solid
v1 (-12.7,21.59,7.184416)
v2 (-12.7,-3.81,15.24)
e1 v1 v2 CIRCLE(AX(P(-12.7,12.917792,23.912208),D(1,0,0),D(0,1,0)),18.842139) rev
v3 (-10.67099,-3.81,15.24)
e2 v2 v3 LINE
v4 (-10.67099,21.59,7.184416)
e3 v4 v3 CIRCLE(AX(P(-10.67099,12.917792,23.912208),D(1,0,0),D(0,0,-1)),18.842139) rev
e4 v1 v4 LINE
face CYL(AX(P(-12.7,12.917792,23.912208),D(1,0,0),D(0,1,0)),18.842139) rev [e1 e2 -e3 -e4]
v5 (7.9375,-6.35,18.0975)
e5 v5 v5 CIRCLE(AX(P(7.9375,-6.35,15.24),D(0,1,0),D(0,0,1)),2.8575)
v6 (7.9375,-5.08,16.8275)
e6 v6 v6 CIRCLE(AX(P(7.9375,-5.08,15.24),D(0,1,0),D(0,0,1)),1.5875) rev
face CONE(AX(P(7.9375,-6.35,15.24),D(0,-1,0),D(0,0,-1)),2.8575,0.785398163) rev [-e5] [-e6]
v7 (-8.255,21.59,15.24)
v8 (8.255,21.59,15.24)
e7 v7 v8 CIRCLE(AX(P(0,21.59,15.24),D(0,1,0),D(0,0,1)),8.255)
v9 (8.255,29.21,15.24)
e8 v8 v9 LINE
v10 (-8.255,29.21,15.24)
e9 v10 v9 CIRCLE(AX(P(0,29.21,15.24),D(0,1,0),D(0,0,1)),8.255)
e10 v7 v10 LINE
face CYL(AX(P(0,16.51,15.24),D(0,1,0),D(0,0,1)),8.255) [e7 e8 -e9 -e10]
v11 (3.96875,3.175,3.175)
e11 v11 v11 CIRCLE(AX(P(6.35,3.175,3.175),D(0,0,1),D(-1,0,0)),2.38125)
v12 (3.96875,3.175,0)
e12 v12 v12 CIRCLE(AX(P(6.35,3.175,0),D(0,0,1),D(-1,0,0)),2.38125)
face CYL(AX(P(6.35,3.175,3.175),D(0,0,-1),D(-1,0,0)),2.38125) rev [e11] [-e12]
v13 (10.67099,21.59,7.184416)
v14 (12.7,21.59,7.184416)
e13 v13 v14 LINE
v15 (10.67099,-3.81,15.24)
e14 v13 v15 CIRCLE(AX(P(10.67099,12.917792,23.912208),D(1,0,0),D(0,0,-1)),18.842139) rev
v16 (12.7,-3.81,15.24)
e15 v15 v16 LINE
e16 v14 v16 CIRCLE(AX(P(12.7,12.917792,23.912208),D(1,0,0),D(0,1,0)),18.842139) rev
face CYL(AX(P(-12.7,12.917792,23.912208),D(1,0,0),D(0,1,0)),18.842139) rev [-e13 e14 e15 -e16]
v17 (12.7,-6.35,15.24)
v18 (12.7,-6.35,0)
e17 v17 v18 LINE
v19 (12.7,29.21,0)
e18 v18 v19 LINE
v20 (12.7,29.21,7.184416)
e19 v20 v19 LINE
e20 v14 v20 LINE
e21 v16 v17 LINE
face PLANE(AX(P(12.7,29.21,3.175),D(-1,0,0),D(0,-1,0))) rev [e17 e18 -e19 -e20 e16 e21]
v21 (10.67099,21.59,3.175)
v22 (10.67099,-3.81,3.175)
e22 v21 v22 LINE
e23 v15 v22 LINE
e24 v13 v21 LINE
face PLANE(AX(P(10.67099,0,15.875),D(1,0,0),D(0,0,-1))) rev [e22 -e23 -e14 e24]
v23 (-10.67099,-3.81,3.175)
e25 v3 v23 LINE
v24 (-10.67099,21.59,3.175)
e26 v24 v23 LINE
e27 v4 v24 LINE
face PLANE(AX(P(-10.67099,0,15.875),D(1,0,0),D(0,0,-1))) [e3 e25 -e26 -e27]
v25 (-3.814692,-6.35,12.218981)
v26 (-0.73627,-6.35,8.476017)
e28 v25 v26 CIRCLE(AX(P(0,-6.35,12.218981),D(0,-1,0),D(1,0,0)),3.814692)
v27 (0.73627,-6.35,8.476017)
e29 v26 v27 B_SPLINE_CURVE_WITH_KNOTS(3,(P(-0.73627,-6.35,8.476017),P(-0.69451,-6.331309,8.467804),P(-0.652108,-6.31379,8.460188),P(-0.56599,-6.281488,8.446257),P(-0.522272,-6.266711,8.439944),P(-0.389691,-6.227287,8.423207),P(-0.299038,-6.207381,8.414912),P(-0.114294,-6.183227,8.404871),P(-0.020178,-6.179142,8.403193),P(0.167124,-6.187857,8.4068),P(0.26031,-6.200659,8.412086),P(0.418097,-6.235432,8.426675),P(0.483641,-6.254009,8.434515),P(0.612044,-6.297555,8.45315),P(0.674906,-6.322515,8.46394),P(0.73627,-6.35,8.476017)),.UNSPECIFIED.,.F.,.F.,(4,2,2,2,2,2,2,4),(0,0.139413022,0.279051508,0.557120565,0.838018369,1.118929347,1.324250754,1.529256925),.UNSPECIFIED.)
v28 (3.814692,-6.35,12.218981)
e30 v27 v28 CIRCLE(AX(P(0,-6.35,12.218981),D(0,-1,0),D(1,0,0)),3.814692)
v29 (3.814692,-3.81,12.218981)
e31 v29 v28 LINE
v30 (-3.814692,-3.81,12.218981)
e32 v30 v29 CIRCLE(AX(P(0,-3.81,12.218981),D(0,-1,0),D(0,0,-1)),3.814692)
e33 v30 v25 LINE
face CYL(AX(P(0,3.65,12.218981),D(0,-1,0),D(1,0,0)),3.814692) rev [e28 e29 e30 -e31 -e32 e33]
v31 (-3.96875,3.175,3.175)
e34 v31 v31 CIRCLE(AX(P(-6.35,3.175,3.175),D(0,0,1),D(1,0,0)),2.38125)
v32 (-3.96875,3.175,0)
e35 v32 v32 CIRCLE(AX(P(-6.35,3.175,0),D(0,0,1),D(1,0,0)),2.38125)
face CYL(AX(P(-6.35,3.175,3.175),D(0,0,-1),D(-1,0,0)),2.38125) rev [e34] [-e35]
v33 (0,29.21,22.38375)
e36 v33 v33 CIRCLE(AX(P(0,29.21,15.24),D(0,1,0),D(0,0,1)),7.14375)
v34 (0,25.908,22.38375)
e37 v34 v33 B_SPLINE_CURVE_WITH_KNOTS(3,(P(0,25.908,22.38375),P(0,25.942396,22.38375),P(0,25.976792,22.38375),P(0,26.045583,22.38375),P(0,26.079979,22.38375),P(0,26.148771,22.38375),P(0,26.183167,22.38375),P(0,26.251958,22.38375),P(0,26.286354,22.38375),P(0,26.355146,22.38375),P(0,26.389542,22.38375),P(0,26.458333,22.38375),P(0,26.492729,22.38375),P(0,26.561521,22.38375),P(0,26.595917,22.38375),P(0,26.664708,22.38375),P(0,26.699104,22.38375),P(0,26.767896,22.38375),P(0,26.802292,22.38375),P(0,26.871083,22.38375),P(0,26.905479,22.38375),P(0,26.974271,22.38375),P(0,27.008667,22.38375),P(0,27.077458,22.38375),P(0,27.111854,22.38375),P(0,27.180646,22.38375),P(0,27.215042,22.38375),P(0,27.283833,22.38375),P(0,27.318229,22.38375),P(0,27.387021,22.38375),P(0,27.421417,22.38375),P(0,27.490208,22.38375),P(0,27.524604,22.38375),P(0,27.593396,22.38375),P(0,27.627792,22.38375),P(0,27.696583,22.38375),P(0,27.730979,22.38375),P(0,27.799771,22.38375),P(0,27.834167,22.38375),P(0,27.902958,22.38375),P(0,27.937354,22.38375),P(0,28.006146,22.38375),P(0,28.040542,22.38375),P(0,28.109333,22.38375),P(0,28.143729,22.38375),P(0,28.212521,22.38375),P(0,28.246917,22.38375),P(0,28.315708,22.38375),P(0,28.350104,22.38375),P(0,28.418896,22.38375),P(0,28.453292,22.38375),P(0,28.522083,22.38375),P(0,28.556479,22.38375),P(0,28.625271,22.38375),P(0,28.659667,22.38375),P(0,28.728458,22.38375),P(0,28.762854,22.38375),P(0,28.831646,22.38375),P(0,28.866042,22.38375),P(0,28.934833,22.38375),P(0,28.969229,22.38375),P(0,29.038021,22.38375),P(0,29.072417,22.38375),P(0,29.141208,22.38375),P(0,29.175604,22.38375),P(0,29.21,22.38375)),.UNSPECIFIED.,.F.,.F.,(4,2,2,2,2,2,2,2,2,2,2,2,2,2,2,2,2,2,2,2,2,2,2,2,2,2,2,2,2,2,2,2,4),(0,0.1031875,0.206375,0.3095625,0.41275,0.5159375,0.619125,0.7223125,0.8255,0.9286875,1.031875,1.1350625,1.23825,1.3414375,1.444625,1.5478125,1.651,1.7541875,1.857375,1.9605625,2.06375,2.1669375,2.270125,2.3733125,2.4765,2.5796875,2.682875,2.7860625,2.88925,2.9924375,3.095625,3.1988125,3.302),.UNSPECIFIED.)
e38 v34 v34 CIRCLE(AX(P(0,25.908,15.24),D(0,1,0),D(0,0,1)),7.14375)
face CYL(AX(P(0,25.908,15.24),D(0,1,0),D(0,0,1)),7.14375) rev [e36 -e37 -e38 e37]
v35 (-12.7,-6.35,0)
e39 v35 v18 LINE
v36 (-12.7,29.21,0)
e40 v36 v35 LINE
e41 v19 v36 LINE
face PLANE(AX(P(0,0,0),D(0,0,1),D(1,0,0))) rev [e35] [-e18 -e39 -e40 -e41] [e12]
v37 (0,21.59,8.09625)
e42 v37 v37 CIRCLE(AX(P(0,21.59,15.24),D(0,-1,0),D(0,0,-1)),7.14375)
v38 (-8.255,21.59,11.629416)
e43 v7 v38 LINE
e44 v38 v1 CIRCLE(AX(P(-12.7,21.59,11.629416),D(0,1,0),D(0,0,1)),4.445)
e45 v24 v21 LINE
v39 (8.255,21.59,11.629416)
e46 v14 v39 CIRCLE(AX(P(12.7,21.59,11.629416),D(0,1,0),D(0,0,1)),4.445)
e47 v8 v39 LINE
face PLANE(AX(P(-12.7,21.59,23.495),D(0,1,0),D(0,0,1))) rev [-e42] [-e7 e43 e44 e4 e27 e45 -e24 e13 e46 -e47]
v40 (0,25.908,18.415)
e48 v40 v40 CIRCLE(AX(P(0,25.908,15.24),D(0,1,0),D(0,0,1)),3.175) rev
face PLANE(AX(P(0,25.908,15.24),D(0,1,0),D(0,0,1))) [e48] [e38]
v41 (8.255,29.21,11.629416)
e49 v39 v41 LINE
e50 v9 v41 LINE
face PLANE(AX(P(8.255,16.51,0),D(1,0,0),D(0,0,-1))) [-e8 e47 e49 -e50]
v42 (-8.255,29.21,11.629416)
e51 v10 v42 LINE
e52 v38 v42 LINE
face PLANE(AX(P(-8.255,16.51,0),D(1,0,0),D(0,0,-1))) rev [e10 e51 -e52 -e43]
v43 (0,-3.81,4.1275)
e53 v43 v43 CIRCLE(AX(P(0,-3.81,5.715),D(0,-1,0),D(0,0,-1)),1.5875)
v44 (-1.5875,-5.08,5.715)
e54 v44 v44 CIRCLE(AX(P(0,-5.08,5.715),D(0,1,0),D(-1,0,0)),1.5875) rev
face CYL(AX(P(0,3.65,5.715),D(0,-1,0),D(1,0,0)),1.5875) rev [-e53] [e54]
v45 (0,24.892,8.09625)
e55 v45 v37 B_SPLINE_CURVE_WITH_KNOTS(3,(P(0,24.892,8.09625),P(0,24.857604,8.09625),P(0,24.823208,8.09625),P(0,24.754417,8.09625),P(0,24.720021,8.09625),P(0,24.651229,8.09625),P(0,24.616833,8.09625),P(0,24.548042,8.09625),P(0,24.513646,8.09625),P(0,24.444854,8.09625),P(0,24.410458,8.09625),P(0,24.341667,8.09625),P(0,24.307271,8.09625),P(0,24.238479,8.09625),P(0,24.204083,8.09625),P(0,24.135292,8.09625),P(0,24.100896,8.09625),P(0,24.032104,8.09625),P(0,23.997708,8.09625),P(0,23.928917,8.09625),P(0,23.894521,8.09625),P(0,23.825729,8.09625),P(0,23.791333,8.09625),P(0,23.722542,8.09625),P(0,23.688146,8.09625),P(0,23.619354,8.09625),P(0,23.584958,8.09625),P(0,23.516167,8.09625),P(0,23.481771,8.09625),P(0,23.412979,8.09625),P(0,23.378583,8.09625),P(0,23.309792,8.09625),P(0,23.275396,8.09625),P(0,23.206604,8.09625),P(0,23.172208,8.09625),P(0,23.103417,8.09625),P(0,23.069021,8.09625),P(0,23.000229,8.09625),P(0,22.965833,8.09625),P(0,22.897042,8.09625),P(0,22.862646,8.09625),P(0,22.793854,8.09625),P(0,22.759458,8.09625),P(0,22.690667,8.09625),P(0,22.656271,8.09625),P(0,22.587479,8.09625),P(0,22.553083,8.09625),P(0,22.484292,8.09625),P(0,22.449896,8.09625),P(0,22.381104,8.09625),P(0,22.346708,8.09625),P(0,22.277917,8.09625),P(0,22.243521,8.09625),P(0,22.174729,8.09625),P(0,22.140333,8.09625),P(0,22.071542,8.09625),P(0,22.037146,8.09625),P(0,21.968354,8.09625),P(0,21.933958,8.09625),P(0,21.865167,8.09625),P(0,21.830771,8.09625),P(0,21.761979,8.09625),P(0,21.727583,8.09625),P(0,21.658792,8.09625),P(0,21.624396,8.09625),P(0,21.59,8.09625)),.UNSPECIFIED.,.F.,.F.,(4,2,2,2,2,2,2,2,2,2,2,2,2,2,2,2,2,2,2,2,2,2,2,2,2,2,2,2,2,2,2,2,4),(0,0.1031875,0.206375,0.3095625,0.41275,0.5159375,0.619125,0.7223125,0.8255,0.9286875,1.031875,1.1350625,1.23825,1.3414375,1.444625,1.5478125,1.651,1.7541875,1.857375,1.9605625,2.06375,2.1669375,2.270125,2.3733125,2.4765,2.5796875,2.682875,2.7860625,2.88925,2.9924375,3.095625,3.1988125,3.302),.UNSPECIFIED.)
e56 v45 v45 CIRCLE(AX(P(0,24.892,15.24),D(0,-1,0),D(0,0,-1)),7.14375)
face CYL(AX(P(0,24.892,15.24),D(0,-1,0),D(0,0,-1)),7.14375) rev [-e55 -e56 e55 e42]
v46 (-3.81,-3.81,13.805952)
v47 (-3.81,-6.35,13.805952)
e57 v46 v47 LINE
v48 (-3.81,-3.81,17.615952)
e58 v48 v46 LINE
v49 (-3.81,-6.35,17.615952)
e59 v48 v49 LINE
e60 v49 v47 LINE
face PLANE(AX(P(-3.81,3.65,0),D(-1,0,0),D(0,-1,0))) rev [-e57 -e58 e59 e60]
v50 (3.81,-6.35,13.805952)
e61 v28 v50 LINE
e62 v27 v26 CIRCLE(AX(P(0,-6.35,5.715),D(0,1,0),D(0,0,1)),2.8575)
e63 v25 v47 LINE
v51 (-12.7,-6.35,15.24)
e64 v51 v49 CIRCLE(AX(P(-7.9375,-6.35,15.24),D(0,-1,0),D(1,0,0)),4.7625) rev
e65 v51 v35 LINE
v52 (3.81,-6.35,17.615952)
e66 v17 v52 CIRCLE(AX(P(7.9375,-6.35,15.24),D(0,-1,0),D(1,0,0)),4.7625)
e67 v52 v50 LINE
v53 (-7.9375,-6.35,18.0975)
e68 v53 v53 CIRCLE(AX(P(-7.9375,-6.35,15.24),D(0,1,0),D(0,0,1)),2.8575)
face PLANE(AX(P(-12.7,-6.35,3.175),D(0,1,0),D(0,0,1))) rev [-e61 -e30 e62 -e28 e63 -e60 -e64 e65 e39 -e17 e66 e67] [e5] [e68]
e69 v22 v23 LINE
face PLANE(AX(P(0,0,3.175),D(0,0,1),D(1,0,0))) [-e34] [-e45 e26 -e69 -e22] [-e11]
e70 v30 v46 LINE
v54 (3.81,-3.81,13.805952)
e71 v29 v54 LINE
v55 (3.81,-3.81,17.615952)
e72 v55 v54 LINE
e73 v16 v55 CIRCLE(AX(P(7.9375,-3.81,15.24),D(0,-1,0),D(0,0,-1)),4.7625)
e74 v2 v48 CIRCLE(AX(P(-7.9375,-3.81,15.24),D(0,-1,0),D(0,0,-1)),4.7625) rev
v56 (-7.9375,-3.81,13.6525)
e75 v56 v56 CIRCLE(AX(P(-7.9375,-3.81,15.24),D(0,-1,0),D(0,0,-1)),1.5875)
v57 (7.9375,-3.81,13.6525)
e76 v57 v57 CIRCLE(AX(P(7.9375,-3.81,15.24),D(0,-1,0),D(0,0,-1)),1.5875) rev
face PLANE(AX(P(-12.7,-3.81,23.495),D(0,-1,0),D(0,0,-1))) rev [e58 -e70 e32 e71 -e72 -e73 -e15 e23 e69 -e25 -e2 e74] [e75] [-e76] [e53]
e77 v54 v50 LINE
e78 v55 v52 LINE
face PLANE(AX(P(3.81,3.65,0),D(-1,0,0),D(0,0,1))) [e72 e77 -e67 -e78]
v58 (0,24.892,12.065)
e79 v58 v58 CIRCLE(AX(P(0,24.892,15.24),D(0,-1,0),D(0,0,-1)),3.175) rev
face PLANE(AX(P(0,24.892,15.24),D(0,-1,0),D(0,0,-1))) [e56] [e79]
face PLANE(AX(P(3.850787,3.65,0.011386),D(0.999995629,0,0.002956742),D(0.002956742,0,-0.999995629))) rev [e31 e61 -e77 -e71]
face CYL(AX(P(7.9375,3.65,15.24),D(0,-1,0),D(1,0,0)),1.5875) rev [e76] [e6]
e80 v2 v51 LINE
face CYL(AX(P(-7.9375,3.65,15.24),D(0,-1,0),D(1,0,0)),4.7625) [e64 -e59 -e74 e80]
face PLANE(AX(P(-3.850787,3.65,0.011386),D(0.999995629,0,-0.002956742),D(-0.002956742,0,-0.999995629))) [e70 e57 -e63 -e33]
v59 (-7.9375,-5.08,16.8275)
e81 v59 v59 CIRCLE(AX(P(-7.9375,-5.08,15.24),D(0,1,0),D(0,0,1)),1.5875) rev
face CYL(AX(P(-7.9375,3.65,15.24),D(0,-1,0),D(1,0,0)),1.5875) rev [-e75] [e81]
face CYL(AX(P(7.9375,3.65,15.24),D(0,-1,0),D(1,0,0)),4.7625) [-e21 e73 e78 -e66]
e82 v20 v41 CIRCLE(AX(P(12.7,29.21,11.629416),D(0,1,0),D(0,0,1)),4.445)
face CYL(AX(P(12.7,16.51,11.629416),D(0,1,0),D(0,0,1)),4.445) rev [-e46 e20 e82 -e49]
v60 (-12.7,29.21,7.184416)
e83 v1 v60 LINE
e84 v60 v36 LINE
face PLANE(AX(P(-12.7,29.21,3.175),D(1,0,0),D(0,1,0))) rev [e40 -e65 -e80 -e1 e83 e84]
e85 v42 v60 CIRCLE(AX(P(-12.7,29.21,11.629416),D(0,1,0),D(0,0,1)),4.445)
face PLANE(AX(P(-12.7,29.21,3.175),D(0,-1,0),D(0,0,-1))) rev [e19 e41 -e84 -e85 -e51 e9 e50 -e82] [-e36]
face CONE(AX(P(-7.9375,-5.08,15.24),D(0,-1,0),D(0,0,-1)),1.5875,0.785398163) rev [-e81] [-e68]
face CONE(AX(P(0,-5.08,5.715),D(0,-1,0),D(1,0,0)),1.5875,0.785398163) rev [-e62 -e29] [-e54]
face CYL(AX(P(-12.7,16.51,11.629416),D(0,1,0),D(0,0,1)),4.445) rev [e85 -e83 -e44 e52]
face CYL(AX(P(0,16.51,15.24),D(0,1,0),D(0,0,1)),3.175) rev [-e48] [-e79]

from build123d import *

# Parameters (mm, degrees)
SKETCH1_W           = 25.4
SKETCH1_H           = 35.56
SKETCH1_R           = 2.38125
BOSS_EXTRUDE1_DEPTH = 3.175
SKETCH7_W           = 25.4
SKETCH7_H           = 2.54
SKETCH7_H_2         = 7.62
BOSS_EXTRUDE3_DEPTH = 20.32
SKETCH11_R          = 1.5875
CUT_EXTRUDE1_DEPTH  = 10
CHAMFER2_SIZE       = 1.27
SKETCH13_R          = 3.175
CUT_EXTRUDE2_DEPTH  = 12.7
SKETCH14_R          = 7.14375
CUT_EXTRUDE3_DEPTH  = 3.302
CUT_EXTRUDE4_START  = -3.302
SKETCH15_R          = 7.14375
CUT_EXTRUDE4_DEPTH  = 3.302
CUT_EXTRUDE5_DEPTH  = 12.7
SKETCH17_W          = 2.029010409
SKETCH17_H          = 25.4
BOSS_EXTRUDE4_DEPTH = 12.7
CUT_EXTRUDE6_DEPTH  = 46.281333074


with BuildPart() as part:
    # Sketch1 → Boss-Extrude1 (new body)
    with BuildSketch(Plane.XY):
        with Locations((0, 11.43)):
            Rectangle(SKETCH1_W, SKETCH1_H)
        with Locations((-6.35, 3.175)):
            Circle(SKETCH1_R, mode=Mode.SUBTRACT)
        with Locations(Location((6.35, 3.175, 0), (0, 0, 180))):
            Circle(SKETCH1_R, mode=Mode.SUBTRACT)
    extrude(amount=BOSS_EXTRUDE1_DEPTH)

    # Sketch7 → Boss-Extrude3 (add)
    with BuildSketch(Plane.XY.offset(3.175)):
        with Locations((0, -5.08)):
            Rectangle(SKETCH7_W, SKETCH7_H)
        with Locations((0, 25.4)):
            Rectangle(SKETCH7_W, SKETCH7_H_2)
    extrude(amount=BOSS_EXTRUDE3_DEPTH)

    # Sketch11 → Cut-Extrude1 (cut)
    with BuildSketch(Plane.XZ.offset(6.35)):
        with Locations((-7.9375, 15.24)):
            Circle(SKETCH11_R)
        with Locations((7.9375, 15.24)):
            Circle(SKETCH11_R)
        with Locations((0, 5.715)):
            Circle(SKETCH11_R)
        with BuildLine():
            Line((-3.814625586, 12.241539102), (-3.814692285, 12.218981082))
            ThreePointArc((-3.814692285, 12.218981082), (0, 8.404288797), (3.814692285, 12.218981082))
            Line((3.814692285, 12.218981082), (3.814625586, 12.241539102))
            Line((3.814625586, 12.241539102), (3.81, 13.805952441))
            Line((3.81, 13.805952441), (3.81, 17.615952441))
            ThreePointArc((3.81, 17.615952441), (9.167172212, 19.841012117), (12.7, 15.24))
            Line((12.7, 15.24), (12.7, 23.495))
            Line((12.7, 23.495), (-12.7, 23.495))
            Line((-12.7, 23.495), (-12.7, 15.24))
            ThreePointArc((-12.7, 15.24), (-9.167172212, 19.841012117), (-3.81, 17.615952441))
            Line((-3.81, 17.615952441), (-3.81, 13.805952441))
            Line((-3.81, 13.805952441), (-3.814625586, 12.241539102))
        make_face()
    extrude(amount=-CUT_EXTRUDE1_DEPTH, mode=Mode.SUBTRACT)

    # Chamfer2
    # the kernel refuses this chamfer: 1.27 mm, written as the material it takes off along each edge
    with BuildSketch(Plane(origin=(-7.9375, -6.35, 15.24), x_dir=(1, 0, 0), z_dir=(0, 0, -1))) as chamfer2_piece_1:
        Polygon((1.5875 + CHAMFER2_SIZE, 0), (1.5875, -CHAMFER2_SIZE), (1.5875, 0), align=None)
    revolve(axis=Axis((-7.9375, -6.35, 15.24), (0, -1, 0)), mode=Mode.SUBTRACT)
    with BuildSketch(Plane(origin=(7.9375, -6.35, 15.24), x_dir=(1, 0, 0), z_dir=(0, 0, -1))) as chamfer2_piece_2:
        Polygon((1.5875 + CHAMFER2_SIZE, 0), (1.5875, -CHAMFER2_SIZE), (1.5875, 0), align=None)
    revolve(axis=Axis((7.9375, -6.35, 15.24), (0, -1, 0)), mode=Mode.SUBTRACT)
    with BuildSketch(Plane(origin=(0, -6.35, 5.715), x_dir=(1, 0, 0), z_dir=(0, 0, -1))) as chamfer2_piece_3:
        Polygon((1.5875 + CHAMFER2_SIZE, 0), (1.5875, -CHAMFER2_SIZE), (1.5875, 0), align=None)
    revolve(axis=Axis((0, -6.35, 5.715), (0, -1, 0)), mode=Mode.SUBTRACT)

    # Sketch13 → Cut-Extrude2 (cut)
    with BuildSketch(Plane(origin=(0, 29.21, 0), x_dir=(1, 0, 0), z_dir=(0, 1, 0))):
        with Locations(Location((0, -15.24, 0), (0, 0, 270))):
            Circle(SKETCH13_R)
    extrude(amount=-CUT_EXTRUDE2_DEPTH, mode=Mode.SUBTRACT)

    # Sketch14 → Cut-Extrude3 (cut)
    with BuildSketch(Plane(origin=(0, 29.21, 0), x_dir=(1, 0, 0), z_dir=(0, 1, 0))):
        with Locations(Location((0, -15.24, 0), (0, 0, 270))):
            Circle(SKETCH14_R)
    extrude(amount=-CUT_EXTRUDE3_DEPTH, mode=Mode.SUBTRACT)

    # Sketch15 → Cut-Extrude4 (cut)
    with BuildSketch(Plane.XZ.offset(-21.59).offset(CUT_EXTRUDE4_START)):
        with Locations(Location((0, 15.24, 0), (0, 0, 90))):
            Circle(SKETCH15_R)
    extrude(amount=CUT_EXTRUDE4_DEPTH, mode=Mode.SUBTRACT)

    # Sketch16 → Cut-Extrude5 (cut)
    with BuildSketch(Plane(origin=(0, 29.21, 0), x_dir=(1, 0, 0), z_dir=(0, 1, 0))):
        with BuildLine():
            ThreePointArc((8.255, -15.24), (5.837166479, -21.077166479), (0, -23.495))
            Line((0, -23.495), (12.7, -23.495))
            Line((12.7, -23.495), (12.7, -7.184415797))
            ThreePointArc((12.7, -7.184415797), (9.556910358, -8.486326154), (8.255, -11.629415797))
            Line((8.255, -11.629415797), (8.255, -15.24))
        make_face()
        with BuildLine():
            ThreePointArc((0, -23.495), (-5.837166479, -21.077166479), (-8.255, -15.24))
            Line((-8.255, -15.24), (-8.255, -11.629415797))
            ThreePointArc((-8.255, -11.629415797), (-9.556910358, -8.486326154), (-12.7, -7.184415797))
            Line((-12.7, -7.184415797), (-12.7, -23.495))
            Line((-12.7, -23.495), (0, -23.495))
        make_face()
    extrude(amount=-CUT_EXTRUDE5_DEPTH, mode=Mode.SUBTRACT)

    # Sketch17 → Boss-Extrude4 (add)
    with BuildSketch(Plane.XY.offset(3.175)):
        with Locations((-11.685494796, 8.89)):
            Rectangle(SKETCH17_W, SKETCH17_H)
        with Locations((11.685494796, 8.89)):
            Rectangle(SKETCH17_W, SKETCH17_H)
    extrude(amount=BOSS_EXTRUDE4_DEPTH)

    # Sketch18 → Cut-Extrude6 (cut, through all)
    with BuildSketch(Plane(origin=(12.7, 0, 0), x_dir=(0, 0, -1), z_dir=(1, 0, 0))):
        with BuildLine():
            ThreePointArc((-7.184415797, 21.59), (-5.951695656, 7.221633885), (-15.24, -3.81))
            Line((-15.24, -3.81), (-15.875, -3.81))
            Line((-15.875, -3.81), (-15.875, 21.59))
            Line((-15.875, 21.59), (-7.184415797, 21.59))
        make_face()
    extrude(amount=-CUT_EXTRUDE6_DEPTH, mode=Mode.SUBTRACT)


solid = part.part
